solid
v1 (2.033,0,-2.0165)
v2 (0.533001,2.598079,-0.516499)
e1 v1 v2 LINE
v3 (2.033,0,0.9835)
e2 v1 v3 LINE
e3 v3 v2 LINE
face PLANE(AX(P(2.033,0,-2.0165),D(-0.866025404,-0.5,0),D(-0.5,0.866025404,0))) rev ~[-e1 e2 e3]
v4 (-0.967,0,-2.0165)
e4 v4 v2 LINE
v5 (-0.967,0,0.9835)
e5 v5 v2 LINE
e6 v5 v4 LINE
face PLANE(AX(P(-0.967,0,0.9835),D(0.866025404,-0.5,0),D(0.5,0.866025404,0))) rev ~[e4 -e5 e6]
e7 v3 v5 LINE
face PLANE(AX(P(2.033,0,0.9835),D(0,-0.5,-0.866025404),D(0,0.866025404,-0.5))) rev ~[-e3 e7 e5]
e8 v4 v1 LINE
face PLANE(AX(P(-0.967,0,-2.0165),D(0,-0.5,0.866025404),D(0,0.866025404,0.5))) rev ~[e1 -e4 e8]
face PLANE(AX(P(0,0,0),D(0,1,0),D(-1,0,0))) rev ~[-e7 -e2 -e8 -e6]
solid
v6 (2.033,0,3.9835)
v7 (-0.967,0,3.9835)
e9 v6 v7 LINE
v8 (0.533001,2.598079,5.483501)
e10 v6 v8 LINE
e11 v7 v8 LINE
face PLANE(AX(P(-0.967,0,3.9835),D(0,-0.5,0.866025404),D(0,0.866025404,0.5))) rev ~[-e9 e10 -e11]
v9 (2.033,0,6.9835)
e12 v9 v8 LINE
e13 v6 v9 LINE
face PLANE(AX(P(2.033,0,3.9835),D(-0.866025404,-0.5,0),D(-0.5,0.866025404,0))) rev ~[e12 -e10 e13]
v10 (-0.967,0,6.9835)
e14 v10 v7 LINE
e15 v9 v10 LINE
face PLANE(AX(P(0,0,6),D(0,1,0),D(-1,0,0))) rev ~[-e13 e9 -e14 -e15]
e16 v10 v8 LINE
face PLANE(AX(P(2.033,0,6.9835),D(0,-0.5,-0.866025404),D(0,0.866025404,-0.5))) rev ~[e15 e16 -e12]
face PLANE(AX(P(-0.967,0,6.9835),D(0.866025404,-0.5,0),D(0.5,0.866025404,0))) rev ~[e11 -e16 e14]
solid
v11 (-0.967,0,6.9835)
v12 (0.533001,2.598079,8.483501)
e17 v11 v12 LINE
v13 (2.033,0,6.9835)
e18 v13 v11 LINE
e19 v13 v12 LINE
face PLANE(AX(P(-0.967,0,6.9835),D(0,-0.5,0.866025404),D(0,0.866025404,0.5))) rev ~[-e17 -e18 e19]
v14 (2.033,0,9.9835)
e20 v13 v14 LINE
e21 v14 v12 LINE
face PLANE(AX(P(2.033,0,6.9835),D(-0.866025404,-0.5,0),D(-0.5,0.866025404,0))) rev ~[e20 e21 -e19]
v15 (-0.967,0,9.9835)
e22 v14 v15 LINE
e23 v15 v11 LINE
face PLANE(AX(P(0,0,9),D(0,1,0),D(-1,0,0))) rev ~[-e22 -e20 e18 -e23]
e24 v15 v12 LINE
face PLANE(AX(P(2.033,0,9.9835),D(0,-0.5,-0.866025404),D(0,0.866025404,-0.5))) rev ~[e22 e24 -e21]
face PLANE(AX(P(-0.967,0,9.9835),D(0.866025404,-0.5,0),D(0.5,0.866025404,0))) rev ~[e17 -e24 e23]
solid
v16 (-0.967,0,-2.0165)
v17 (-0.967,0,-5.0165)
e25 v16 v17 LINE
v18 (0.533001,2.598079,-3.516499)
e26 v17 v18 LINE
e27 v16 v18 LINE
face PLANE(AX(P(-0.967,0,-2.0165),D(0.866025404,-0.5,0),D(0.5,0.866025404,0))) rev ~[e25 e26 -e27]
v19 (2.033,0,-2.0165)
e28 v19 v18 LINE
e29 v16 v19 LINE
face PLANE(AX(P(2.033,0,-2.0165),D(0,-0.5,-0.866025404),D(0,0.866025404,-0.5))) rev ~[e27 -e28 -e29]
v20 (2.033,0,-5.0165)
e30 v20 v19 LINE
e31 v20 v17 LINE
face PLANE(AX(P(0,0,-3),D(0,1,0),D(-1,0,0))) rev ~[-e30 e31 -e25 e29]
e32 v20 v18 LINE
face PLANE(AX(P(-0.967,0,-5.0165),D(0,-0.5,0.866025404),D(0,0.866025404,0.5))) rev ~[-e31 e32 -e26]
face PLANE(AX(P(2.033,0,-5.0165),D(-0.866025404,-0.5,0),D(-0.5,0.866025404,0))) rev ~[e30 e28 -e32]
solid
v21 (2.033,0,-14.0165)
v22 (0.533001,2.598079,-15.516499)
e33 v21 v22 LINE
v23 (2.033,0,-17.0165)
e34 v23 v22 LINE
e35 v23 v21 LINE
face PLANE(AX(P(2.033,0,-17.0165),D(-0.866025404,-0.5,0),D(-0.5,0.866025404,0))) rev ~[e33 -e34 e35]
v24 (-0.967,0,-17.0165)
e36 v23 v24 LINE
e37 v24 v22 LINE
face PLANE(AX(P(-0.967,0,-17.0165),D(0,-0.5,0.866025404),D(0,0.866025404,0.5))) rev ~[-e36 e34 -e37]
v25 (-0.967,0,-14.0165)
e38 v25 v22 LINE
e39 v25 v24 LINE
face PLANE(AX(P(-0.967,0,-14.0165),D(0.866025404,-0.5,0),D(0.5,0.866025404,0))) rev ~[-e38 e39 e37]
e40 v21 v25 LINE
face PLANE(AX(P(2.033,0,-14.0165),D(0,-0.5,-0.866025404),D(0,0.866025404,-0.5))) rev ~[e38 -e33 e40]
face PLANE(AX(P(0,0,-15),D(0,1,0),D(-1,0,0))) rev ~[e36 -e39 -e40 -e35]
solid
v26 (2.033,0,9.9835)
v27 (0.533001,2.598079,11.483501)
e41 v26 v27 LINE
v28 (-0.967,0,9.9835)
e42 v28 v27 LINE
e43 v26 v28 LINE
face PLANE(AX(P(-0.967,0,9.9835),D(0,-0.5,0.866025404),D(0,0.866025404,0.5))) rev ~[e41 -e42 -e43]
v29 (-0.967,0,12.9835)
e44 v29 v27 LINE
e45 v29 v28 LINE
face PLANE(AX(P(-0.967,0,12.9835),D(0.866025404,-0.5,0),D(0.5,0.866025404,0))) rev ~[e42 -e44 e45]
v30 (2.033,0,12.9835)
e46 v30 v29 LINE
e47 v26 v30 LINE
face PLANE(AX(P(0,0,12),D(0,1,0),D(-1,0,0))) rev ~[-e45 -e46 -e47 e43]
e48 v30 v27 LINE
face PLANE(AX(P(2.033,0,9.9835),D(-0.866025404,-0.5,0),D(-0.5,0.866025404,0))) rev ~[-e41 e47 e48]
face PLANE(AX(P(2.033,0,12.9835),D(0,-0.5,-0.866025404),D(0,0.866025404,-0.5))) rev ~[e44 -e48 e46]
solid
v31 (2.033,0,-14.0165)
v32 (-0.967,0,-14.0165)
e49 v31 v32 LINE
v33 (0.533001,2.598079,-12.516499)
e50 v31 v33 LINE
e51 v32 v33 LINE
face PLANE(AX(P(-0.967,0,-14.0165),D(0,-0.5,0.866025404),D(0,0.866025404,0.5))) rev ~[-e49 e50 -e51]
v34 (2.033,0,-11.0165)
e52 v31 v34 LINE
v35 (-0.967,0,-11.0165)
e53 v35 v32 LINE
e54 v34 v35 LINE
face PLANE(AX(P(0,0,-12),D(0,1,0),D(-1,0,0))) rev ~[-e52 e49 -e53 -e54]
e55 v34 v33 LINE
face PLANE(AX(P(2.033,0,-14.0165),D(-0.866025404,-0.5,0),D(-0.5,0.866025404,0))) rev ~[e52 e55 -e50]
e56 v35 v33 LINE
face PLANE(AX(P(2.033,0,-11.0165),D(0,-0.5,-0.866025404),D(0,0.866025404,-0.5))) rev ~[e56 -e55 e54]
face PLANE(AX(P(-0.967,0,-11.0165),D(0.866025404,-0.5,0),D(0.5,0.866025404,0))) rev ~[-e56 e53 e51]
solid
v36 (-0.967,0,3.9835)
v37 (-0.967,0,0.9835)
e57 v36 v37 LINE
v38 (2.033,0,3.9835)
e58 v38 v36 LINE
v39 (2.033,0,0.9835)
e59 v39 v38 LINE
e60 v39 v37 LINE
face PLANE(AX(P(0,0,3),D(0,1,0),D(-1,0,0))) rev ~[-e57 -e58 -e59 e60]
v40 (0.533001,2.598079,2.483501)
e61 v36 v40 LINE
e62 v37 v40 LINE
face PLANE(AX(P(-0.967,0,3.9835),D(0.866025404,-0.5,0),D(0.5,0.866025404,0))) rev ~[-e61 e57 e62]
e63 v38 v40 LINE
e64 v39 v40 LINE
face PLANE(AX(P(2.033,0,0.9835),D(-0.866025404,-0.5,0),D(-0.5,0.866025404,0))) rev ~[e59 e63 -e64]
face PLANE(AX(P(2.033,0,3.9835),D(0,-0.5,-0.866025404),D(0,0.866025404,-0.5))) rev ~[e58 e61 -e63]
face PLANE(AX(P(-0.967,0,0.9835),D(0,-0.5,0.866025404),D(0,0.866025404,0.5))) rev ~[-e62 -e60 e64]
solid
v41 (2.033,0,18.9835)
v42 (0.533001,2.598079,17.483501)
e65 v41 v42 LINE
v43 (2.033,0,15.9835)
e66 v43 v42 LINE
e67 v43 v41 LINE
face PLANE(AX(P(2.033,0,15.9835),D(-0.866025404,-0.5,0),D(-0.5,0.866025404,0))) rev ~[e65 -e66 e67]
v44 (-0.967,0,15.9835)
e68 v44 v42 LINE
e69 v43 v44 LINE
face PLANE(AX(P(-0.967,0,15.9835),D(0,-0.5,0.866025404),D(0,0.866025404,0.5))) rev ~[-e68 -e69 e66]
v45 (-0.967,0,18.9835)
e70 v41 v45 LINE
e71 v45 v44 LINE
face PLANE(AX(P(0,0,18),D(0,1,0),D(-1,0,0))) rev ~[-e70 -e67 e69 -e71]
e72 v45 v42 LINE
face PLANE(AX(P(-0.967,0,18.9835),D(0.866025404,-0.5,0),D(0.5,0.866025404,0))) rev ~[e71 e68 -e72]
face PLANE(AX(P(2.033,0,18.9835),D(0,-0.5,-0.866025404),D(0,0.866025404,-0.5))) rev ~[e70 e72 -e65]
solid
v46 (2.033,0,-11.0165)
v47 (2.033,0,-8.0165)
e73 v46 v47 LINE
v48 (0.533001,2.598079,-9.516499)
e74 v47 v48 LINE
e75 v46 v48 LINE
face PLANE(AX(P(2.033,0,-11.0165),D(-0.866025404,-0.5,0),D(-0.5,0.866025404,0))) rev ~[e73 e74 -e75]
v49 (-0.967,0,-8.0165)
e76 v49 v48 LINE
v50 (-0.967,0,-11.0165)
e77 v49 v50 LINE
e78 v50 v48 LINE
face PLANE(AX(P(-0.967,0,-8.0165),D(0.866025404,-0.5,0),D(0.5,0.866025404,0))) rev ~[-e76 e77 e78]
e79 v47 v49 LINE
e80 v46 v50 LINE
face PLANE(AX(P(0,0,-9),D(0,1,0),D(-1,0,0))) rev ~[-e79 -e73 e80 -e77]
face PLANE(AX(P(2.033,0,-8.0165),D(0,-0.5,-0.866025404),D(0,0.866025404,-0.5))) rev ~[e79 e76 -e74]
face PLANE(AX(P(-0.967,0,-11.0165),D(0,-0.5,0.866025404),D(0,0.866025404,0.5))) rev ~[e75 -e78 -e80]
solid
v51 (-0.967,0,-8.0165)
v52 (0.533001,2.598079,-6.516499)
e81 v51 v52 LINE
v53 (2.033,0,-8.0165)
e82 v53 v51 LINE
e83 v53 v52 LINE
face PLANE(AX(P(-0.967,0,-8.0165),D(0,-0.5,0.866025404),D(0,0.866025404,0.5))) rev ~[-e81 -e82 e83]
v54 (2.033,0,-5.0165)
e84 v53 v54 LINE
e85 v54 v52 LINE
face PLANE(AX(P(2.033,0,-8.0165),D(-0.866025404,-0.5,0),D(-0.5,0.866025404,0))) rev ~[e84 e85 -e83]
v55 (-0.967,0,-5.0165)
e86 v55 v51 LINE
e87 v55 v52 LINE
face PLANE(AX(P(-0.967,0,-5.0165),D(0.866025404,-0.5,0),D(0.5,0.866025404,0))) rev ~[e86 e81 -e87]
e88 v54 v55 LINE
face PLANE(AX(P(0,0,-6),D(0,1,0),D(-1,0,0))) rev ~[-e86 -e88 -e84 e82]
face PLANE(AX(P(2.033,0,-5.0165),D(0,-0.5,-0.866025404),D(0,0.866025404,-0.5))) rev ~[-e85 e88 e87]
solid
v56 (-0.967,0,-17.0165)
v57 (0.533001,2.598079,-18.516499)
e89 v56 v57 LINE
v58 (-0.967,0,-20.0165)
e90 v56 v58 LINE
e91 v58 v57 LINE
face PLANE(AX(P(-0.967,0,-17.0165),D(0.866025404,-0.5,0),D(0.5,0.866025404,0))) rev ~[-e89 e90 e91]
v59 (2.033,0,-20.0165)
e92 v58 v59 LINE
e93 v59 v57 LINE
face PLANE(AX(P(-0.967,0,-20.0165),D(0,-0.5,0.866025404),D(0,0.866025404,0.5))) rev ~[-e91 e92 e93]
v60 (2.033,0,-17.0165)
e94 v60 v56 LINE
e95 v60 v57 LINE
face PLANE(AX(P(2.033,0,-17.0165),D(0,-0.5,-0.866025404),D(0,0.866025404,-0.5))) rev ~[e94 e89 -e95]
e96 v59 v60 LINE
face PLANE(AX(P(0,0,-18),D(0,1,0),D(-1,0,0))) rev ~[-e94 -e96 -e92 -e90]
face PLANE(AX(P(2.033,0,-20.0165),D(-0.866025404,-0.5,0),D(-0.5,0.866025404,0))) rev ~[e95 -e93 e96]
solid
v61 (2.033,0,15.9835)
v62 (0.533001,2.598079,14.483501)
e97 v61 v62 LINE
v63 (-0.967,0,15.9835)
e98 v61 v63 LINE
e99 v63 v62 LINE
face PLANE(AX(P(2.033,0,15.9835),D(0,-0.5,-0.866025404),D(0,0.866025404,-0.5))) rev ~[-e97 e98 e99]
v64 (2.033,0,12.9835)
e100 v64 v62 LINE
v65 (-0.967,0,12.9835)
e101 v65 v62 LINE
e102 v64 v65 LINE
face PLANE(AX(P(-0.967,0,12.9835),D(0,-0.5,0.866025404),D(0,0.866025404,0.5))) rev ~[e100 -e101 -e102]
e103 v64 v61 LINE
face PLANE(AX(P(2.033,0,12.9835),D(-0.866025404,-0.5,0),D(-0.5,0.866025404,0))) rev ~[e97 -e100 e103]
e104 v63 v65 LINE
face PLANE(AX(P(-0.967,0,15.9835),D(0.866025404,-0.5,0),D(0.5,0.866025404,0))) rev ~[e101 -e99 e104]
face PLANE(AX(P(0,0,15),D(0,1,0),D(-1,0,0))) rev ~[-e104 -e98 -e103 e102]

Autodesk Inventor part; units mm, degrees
ref_plane "YZ Plane" through (0, 0, 0) normal (1, 0, 0) x (0, 1, 0)
ref_plane "XZ Plane" through (0, 0, 0) normal (0, 1, 0) x (-1, 0, 0)
ref_plane "XY Plane" through (0, 0, 0) normal (0, 0, 1) x (1, 0, 0)
sketch "Sketch1" plane through (0, 0, 0) normal (0, 1, 0) x (-1, 0, 0)
  line L0 (-2.033, 0.9835) -> (0.967, 0.9835)
  line L1 (0.967, 0.9835) -> (0.967, -2.0165)
  line L2 (0.967, -2.0165) -> (-2.033, -2.0165)
  line L3 (-2.033, -2.0165) -> (-2.033, 0.9835)
  point P0 (0, 0)
  dimension "d0" = 3
  dimension "d1" = 3
extrude "Extrusion1" add sketch "Sketch1" along normal blind 3 draft -30
pattern_linear "Rectangular Pattern1" count 13 spacing 3 along (0, 0, 1) of "Extrusion1" first direction both ways yes
properties part number "pyr" material "Titanium"
